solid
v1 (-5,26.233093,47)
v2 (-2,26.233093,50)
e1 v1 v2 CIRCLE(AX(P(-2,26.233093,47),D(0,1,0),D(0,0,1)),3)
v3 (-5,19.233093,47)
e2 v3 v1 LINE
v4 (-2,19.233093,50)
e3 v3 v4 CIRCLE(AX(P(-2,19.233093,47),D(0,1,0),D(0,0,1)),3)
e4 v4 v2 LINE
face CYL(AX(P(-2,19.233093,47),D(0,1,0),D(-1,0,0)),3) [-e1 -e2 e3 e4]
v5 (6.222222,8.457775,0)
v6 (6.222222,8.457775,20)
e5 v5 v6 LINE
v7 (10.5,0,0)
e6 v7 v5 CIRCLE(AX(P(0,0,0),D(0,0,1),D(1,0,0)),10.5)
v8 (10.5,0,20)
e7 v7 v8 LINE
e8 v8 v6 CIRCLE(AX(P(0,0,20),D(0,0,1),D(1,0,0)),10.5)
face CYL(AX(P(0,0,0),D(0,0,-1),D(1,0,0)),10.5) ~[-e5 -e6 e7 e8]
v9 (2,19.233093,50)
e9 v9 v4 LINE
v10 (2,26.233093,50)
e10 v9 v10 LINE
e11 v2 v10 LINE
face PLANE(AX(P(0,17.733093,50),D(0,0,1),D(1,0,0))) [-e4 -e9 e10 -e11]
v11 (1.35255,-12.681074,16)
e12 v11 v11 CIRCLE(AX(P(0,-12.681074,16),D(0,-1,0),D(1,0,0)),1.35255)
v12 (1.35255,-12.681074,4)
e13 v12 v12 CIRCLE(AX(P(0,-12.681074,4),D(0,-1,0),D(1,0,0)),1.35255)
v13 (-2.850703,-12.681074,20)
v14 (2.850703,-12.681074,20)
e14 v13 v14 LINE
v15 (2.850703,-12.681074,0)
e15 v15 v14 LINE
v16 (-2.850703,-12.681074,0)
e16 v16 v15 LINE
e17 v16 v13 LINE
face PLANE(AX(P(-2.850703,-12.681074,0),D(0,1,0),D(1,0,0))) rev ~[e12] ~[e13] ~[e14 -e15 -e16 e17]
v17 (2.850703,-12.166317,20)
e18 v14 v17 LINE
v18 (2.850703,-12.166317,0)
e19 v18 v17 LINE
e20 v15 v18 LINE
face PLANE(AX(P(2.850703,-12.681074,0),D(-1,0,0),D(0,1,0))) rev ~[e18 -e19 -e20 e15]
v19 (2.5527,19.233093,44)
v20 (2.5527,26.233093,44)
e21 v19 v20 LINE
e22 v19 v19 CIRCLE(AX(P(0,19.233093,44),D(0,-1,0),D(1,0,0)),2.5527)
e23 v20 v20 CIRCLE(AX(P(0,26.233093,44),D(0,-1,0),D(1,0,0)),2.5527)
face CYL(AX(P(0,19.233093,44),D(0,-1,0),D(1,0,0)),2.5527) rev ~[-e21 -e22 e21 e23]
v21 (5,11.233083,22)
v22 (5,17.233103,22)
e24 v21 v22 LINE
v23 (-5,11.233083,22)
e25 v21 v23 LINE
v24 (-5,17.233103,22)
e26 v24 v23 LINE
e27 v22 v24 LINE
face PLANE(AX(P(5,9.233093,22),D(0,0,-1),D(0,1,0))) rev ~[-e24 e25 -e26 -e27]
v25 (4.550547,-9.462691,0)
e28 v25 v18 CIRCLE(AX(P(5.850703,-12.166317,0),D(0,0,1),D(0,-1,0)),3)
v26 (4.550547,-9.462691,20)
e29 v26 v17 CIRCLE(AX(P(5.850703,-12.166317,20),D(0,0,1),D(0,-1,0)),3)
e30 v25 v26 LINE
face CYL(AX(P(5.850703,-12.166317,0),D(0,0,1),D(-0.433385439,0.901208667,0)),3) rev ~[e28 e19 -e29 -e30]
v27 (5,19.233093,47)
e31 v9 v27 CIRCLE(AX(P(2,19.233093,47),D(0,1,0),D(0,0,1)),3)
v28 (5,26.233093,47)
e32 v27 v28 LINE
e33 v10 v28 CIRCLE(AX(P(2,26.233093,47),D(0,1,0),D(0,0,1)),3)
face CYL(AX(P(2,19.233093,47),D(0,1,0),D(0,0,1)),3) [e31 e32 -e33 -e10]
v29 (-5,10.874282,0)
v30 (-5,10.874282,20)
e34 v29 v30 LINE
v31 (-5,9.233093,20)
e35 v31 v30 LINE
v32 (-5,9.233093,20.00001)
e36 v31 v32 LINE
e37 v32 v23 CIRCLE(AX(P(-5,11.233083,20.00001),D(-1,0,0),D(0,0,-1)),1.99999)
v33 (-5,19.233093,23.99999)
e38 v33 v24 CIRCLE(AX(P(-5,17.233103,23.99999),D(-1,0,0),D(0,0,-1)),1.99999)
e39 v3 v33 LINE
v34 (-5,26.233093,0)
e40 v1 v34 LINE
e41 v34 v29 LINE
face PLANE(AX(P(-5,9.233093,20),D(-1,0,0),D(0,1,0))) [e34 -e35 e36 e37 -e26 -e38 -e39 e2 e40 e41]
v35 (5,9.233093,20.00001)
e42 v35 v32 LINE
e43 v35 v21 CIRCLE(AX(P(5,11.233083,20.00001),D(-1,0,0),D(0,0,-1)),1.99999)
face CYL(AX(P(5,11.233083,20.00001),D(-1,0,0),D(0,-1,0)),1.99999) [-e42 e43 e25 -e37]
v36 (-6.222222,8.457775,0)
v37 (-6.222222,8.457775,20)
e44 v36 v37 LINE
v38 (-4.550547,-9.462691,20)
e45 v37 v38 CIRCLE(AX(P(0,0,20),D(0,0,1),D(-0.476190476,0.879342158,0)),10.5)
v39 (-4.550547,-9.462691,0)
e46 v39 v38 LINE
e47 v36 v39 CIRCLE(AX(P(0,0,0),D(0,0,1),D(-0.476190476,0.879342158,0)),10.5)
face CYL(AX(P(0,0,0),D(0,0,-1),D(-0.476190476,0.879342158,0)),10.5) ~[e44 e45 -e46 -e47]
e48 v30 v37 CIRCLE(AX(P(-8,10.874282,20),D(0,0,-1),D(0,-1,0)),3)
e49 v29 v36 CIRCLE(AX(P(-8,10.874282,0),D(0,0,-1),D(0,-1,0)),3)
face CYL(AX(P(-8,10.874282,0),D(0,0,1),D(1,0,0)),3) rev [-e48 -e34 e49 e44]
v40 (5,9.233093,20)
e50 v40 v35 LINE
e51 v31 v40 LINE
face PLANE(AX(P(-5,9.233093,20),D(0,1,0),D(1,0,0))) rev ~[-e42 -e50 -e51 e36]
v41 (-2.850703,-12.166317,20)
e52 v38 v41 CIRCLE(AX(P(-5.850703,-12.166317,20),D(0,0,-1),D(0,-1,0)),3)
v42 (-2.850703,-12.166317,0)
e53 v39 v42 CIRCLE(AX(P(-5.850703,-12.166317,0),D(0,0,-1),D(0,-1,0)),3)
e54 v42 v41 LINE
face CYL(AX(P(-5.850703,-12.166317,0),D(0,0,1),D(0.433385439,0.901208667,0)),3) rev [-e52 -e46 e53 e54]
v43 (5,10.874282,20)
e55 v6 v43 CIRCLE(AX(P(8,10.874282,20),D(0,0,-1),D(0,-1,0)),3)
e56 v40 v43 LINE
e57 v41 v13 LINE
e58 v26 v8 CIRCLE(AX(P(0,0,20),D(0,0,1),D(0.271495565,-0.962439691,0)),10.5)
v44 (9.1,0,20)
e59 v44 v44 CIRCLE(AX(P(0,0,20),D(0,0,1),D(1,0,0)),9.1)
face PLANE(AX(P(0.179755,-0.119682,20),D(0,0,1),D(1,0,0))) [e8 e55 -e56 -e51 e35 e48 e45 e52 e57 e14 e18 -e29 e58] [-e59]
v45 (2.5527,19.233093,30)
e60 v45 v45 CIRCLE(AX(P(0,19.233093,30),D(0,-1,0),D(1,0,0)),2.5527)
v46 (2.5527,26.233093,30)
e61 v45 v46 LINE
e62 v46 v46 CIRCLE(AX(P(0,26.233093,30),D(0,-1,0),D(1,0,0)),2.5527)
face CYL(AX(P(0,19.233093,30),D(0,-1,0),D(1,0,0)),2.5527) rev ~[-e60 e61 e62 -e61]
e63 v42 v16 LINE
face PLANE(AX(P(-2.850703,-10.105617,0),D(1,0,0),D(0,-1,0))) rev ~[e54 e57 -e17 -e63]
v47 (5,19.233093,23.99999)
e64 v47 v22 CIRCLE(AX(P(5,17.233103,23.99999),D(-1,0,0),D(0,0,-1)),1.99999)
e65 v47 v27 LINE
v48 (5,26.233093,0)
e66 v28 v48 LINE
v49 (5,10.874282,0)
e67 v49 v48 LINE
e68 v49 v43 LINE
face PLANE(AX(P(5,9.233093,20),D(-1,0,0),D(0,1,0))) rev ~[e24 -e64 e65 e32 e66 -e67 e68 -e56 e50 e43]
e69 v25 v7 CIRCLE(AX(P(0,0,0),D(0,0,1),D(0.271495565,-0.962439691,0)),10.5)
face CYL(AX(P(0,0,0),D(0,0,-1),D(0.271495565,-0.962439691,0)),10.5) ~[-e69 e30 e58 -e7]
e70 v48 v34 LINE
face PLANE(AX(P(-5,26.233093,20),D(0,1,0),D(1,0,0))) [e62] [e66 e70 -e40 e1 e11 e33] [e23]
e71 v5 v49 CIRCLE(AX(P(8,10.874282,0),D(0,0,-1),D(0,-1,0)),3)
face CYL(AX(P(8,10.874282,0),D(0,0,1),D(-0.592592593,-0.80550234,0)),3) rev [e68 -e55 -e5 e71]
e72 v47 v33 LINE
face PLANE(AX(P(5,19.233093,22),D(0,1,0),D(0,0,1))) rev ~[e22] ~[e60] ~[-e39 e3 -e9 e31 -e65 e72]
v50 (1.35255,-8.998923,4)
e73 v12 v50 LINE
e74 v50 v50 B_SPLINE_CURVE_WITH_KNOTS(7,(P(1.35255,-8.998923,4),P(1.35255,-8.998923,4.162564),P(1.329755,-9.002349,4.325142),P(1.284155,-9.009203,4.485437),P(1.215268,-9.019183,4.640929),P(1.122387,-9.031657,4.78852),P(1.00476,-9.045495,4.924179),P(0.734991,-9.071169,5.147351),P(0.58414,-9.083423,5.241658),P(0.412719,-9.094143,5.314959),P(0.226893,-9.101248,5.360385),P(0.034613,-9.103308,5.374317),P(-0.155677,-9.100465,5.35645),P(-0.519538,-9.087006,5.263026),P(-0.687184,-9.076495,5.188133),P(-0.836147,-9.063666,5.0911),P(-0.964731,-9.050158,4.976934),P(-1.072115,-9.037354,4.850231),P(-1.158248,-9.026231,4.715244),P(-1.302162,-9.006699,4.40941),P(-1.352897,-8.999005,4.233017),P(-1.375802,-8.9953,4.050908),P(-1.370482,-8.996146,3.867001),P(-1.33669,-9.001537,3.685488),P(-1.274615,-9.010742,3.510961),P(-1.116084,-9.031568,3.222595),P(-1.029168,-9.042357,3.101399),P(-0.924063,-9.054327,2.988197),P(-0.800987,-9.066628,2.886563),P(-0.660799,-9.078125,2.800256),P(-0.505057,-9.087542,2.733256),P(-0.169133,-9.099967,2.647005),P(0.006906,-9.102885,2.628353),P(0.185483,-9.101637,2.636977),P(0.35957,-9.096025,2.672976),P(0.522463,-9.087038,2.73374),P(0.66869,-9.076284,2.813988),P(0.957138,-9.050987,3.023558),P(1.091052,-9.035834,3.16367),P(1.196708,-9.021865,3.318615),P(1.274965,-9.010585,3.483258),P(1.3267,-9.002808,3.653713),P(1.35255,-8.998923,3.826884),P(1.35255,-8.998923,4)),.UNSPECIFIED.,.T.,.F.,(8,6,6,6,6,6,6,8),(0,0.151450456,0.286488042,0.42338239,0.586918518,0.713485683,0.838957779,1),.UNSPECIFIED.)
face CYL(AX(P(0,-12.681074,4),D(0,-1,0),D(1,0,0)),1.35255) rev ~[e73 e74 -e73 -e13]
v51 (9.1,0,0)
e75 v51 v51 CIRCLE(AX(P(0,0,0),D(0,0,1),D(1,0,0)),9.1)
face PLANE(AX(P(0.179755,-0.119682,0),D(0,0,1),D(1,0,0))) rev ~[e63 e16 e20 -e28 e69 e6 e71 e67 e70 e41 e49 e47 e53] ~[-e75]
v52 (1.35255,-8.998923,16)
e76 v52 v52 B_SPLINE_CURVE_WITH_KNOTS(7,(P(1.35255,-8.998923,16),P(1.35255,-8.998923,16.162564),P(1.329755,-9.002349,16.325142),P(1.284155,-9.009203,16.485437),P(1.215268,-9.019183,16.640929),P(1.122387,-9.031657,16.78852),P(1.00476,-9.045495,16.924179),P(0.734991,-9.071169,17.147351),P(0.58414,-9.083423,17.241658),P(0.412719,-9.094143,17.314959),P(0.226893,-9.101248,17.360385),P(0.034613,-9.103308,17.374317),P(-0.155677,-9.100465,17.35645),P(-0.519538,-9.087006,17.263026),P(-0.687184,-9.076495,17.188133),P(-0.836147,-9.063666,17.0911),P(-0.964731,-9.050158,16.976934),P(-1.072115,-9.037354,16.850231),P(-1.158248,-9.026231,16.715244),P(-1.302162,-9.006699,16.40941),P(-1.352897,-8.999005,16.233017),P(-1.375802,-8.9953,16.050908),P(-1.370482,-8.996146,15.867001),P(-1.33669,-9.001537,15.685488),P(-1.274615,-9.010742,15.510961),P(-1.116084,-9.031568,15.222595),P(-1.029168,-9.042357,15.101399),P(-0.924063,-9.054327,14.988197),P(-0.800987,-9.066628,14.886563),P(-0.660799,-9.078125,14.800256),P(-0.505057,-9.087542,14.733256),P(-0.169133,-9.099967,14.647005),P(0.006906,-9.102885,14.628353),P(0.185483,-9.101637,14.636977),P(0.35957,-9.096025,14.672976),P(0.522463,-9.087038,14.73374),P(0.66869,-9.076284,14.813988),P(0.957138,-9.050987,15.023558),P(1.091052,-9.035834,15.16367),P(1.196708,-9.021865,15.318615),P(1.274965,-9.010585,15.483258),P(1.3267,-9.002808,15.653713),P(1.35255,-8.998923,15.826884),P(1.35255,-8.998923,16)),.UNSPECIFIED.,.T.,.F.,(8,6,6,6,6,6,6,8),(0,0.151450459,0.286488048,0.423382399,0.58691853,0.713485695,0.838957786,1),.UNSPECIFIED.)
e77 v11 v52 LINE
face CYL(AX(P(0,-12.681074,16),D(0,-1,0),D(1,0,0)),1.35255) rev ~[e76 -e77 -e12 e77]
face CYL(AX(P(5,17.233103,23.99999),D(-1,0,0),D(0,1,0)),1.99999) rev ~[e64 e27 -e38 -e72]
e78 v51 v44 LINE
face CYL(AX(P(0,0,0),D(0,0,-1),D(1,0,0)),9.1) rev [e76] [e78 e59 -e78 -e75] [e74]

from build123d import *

# Parameters (mm, degrees)
F0_R      = 9.1
F1_DEPTH  = 20
F2_W      = 10
F2_H      = 17
F3_DEPTH  = 30
F4_W      = 10
F4_H      = 28
F5_DEPTH  = 25.4
F6_R      = 3
F7_R      = 1.99999
F8_R      = 2.5527
F9_DEPTH  = 7.001
F10_R     = 1.35255
F11_DEPTH = 3.6831519111


# Not quite as in the source:
# - a fillet or chamfer is up to 0.001 mm smaller than in the source, because OpenCascade refuses the exact size


with BuildPart() as f1:
    # F0 (on Top) → F1 (new body)
    with BuildSketch(Plane.XY):
        with BuildLine():
            ThreePointArc((2.8507034294, -10.1056167529), (8.3720483159, -6.3370976792), (10.5, 0))
            ThreePointArc((10.5, 0), (9.0208092763, 5.3735463151), (5, 9.2330926563))
            Line((5, 9.2330926563), (-5, 9.2330926563))
            ThreePointArc((-5, 9.2330926563), (-10.4357465707, -1.1598247764), (-2.8507034294, -10.1056167529))
            Line((-2.8507034294, -10.1056167529), (2.8507034294, -10.1056167529))
        make_face()
        Circle(F0_R, mode=Mode.SUBTRACT)
        with BuildLine():
            Line((-5, 9.2330926563), (5, 9.2330926563))
            ThreePointArc((5, 9.2330926563), (0, 10.5), (-5, 9.2330926563))
        make_face()
        with BuildLine():
            ThreePointArc((-5, 9.2330926563), (0, 10.5), (5, 9.2330926563))
            Line((5, 9.2330926563), (5, 26.2330926563))
            Line((5, 26.2330926563), (-5, 26.2330926563))
            Line((-5, 26.2330926563), (-5, 9.2330926563))
        make_face()
        with BuildLine():
            Line((2.8507034294, -12.6810744405), (2.8507034294, -10.1056167529))
            ThreePointArc((2.8507034294, -10.1056167529), (0, -10.5), (-2.8507034294, -10.1056167529))
            Line((-2.8507034294, -10.1056167529), (-2.8507034294, -12.6810744405))
            Line((-2.8507034294, -12.6810744405), (2.8507034294, -12.6810744405))
        make_face()
        with BuildLine():
            ThreePointArc((-2.8507034294, -10.1056167529), (0, -10.5), (2.8507034294, -10.1056167529))
            Line((2.8507034294, -10.1056167529), (-2.8507034294, -10.1056167529))
        make_face()
    extrude(amount=F1_DEPTH)

    # F2 (on face) → F3 (join)
    with BuildSketch(Plane.XY.offset(20)):
        with Locations((0, 17.7330926563)):
            Rectangle(F2_W, F2_H)
    extrude(amount=F3_DEPTH)

    # F4 (on face) → F5 (cut)
    with BuildSketch(Plane.YZ.offset(5)):
        with Locations((14.2330926563, 36)):
            Rectangle(F4_W, F4_H)
    extrude(amount=-F5_DEPTH, mode=Mode.SUBTRACT)

    # F6
    f6_edges = [f1.edges().sort_by_distance(p)[0] for p in [
        (5, 9.233093, 10),
        (-5, 9.233093, 10),
        (-5, 22.733093, 50),
        (5, 22.733093, 50),
        (2.850703, -10.105617, 10),
        (-2.850703, -10.105617, 10),
    ]]
    fillet(f6_edges, radius=F6_R)

    # F7 (radius 2 in the source; OpenCascade refuses exactly that, so slightly less here)
    f7_edges = [f1.edges().sort_by_distance(p)[0] for p in [
        (0, 9.233093, 22),
        (0, 19.233093, 22),
    ]]
    fillet(f7_edges, radius=F7_R)

    # F8 (on face) → F9 (cut, through all)
    with BuildSketch(Plane.XZ.offset(-19.2330926563)):
        with Locations((0, 44)):
            Circle(F8_R)
        with Locations((0, 30)):
            Circle(F8_R)
    extrude(amount=-F9_DEPTH, mode=Mode.SUBTRACT)

    # F10 (on face) → F11 (cut, through all)
    with BuildSketch(Plane.XZ.offset(12.6810744405)):
        with Locations((0, 16)):
            Circle(F10_R)
        with Locations((0, 4)):
            Circle(F10_R)
    extrude(amount=-F11_DEPTH, mode=Mode.SUBTRACT)


solid = f1.part
